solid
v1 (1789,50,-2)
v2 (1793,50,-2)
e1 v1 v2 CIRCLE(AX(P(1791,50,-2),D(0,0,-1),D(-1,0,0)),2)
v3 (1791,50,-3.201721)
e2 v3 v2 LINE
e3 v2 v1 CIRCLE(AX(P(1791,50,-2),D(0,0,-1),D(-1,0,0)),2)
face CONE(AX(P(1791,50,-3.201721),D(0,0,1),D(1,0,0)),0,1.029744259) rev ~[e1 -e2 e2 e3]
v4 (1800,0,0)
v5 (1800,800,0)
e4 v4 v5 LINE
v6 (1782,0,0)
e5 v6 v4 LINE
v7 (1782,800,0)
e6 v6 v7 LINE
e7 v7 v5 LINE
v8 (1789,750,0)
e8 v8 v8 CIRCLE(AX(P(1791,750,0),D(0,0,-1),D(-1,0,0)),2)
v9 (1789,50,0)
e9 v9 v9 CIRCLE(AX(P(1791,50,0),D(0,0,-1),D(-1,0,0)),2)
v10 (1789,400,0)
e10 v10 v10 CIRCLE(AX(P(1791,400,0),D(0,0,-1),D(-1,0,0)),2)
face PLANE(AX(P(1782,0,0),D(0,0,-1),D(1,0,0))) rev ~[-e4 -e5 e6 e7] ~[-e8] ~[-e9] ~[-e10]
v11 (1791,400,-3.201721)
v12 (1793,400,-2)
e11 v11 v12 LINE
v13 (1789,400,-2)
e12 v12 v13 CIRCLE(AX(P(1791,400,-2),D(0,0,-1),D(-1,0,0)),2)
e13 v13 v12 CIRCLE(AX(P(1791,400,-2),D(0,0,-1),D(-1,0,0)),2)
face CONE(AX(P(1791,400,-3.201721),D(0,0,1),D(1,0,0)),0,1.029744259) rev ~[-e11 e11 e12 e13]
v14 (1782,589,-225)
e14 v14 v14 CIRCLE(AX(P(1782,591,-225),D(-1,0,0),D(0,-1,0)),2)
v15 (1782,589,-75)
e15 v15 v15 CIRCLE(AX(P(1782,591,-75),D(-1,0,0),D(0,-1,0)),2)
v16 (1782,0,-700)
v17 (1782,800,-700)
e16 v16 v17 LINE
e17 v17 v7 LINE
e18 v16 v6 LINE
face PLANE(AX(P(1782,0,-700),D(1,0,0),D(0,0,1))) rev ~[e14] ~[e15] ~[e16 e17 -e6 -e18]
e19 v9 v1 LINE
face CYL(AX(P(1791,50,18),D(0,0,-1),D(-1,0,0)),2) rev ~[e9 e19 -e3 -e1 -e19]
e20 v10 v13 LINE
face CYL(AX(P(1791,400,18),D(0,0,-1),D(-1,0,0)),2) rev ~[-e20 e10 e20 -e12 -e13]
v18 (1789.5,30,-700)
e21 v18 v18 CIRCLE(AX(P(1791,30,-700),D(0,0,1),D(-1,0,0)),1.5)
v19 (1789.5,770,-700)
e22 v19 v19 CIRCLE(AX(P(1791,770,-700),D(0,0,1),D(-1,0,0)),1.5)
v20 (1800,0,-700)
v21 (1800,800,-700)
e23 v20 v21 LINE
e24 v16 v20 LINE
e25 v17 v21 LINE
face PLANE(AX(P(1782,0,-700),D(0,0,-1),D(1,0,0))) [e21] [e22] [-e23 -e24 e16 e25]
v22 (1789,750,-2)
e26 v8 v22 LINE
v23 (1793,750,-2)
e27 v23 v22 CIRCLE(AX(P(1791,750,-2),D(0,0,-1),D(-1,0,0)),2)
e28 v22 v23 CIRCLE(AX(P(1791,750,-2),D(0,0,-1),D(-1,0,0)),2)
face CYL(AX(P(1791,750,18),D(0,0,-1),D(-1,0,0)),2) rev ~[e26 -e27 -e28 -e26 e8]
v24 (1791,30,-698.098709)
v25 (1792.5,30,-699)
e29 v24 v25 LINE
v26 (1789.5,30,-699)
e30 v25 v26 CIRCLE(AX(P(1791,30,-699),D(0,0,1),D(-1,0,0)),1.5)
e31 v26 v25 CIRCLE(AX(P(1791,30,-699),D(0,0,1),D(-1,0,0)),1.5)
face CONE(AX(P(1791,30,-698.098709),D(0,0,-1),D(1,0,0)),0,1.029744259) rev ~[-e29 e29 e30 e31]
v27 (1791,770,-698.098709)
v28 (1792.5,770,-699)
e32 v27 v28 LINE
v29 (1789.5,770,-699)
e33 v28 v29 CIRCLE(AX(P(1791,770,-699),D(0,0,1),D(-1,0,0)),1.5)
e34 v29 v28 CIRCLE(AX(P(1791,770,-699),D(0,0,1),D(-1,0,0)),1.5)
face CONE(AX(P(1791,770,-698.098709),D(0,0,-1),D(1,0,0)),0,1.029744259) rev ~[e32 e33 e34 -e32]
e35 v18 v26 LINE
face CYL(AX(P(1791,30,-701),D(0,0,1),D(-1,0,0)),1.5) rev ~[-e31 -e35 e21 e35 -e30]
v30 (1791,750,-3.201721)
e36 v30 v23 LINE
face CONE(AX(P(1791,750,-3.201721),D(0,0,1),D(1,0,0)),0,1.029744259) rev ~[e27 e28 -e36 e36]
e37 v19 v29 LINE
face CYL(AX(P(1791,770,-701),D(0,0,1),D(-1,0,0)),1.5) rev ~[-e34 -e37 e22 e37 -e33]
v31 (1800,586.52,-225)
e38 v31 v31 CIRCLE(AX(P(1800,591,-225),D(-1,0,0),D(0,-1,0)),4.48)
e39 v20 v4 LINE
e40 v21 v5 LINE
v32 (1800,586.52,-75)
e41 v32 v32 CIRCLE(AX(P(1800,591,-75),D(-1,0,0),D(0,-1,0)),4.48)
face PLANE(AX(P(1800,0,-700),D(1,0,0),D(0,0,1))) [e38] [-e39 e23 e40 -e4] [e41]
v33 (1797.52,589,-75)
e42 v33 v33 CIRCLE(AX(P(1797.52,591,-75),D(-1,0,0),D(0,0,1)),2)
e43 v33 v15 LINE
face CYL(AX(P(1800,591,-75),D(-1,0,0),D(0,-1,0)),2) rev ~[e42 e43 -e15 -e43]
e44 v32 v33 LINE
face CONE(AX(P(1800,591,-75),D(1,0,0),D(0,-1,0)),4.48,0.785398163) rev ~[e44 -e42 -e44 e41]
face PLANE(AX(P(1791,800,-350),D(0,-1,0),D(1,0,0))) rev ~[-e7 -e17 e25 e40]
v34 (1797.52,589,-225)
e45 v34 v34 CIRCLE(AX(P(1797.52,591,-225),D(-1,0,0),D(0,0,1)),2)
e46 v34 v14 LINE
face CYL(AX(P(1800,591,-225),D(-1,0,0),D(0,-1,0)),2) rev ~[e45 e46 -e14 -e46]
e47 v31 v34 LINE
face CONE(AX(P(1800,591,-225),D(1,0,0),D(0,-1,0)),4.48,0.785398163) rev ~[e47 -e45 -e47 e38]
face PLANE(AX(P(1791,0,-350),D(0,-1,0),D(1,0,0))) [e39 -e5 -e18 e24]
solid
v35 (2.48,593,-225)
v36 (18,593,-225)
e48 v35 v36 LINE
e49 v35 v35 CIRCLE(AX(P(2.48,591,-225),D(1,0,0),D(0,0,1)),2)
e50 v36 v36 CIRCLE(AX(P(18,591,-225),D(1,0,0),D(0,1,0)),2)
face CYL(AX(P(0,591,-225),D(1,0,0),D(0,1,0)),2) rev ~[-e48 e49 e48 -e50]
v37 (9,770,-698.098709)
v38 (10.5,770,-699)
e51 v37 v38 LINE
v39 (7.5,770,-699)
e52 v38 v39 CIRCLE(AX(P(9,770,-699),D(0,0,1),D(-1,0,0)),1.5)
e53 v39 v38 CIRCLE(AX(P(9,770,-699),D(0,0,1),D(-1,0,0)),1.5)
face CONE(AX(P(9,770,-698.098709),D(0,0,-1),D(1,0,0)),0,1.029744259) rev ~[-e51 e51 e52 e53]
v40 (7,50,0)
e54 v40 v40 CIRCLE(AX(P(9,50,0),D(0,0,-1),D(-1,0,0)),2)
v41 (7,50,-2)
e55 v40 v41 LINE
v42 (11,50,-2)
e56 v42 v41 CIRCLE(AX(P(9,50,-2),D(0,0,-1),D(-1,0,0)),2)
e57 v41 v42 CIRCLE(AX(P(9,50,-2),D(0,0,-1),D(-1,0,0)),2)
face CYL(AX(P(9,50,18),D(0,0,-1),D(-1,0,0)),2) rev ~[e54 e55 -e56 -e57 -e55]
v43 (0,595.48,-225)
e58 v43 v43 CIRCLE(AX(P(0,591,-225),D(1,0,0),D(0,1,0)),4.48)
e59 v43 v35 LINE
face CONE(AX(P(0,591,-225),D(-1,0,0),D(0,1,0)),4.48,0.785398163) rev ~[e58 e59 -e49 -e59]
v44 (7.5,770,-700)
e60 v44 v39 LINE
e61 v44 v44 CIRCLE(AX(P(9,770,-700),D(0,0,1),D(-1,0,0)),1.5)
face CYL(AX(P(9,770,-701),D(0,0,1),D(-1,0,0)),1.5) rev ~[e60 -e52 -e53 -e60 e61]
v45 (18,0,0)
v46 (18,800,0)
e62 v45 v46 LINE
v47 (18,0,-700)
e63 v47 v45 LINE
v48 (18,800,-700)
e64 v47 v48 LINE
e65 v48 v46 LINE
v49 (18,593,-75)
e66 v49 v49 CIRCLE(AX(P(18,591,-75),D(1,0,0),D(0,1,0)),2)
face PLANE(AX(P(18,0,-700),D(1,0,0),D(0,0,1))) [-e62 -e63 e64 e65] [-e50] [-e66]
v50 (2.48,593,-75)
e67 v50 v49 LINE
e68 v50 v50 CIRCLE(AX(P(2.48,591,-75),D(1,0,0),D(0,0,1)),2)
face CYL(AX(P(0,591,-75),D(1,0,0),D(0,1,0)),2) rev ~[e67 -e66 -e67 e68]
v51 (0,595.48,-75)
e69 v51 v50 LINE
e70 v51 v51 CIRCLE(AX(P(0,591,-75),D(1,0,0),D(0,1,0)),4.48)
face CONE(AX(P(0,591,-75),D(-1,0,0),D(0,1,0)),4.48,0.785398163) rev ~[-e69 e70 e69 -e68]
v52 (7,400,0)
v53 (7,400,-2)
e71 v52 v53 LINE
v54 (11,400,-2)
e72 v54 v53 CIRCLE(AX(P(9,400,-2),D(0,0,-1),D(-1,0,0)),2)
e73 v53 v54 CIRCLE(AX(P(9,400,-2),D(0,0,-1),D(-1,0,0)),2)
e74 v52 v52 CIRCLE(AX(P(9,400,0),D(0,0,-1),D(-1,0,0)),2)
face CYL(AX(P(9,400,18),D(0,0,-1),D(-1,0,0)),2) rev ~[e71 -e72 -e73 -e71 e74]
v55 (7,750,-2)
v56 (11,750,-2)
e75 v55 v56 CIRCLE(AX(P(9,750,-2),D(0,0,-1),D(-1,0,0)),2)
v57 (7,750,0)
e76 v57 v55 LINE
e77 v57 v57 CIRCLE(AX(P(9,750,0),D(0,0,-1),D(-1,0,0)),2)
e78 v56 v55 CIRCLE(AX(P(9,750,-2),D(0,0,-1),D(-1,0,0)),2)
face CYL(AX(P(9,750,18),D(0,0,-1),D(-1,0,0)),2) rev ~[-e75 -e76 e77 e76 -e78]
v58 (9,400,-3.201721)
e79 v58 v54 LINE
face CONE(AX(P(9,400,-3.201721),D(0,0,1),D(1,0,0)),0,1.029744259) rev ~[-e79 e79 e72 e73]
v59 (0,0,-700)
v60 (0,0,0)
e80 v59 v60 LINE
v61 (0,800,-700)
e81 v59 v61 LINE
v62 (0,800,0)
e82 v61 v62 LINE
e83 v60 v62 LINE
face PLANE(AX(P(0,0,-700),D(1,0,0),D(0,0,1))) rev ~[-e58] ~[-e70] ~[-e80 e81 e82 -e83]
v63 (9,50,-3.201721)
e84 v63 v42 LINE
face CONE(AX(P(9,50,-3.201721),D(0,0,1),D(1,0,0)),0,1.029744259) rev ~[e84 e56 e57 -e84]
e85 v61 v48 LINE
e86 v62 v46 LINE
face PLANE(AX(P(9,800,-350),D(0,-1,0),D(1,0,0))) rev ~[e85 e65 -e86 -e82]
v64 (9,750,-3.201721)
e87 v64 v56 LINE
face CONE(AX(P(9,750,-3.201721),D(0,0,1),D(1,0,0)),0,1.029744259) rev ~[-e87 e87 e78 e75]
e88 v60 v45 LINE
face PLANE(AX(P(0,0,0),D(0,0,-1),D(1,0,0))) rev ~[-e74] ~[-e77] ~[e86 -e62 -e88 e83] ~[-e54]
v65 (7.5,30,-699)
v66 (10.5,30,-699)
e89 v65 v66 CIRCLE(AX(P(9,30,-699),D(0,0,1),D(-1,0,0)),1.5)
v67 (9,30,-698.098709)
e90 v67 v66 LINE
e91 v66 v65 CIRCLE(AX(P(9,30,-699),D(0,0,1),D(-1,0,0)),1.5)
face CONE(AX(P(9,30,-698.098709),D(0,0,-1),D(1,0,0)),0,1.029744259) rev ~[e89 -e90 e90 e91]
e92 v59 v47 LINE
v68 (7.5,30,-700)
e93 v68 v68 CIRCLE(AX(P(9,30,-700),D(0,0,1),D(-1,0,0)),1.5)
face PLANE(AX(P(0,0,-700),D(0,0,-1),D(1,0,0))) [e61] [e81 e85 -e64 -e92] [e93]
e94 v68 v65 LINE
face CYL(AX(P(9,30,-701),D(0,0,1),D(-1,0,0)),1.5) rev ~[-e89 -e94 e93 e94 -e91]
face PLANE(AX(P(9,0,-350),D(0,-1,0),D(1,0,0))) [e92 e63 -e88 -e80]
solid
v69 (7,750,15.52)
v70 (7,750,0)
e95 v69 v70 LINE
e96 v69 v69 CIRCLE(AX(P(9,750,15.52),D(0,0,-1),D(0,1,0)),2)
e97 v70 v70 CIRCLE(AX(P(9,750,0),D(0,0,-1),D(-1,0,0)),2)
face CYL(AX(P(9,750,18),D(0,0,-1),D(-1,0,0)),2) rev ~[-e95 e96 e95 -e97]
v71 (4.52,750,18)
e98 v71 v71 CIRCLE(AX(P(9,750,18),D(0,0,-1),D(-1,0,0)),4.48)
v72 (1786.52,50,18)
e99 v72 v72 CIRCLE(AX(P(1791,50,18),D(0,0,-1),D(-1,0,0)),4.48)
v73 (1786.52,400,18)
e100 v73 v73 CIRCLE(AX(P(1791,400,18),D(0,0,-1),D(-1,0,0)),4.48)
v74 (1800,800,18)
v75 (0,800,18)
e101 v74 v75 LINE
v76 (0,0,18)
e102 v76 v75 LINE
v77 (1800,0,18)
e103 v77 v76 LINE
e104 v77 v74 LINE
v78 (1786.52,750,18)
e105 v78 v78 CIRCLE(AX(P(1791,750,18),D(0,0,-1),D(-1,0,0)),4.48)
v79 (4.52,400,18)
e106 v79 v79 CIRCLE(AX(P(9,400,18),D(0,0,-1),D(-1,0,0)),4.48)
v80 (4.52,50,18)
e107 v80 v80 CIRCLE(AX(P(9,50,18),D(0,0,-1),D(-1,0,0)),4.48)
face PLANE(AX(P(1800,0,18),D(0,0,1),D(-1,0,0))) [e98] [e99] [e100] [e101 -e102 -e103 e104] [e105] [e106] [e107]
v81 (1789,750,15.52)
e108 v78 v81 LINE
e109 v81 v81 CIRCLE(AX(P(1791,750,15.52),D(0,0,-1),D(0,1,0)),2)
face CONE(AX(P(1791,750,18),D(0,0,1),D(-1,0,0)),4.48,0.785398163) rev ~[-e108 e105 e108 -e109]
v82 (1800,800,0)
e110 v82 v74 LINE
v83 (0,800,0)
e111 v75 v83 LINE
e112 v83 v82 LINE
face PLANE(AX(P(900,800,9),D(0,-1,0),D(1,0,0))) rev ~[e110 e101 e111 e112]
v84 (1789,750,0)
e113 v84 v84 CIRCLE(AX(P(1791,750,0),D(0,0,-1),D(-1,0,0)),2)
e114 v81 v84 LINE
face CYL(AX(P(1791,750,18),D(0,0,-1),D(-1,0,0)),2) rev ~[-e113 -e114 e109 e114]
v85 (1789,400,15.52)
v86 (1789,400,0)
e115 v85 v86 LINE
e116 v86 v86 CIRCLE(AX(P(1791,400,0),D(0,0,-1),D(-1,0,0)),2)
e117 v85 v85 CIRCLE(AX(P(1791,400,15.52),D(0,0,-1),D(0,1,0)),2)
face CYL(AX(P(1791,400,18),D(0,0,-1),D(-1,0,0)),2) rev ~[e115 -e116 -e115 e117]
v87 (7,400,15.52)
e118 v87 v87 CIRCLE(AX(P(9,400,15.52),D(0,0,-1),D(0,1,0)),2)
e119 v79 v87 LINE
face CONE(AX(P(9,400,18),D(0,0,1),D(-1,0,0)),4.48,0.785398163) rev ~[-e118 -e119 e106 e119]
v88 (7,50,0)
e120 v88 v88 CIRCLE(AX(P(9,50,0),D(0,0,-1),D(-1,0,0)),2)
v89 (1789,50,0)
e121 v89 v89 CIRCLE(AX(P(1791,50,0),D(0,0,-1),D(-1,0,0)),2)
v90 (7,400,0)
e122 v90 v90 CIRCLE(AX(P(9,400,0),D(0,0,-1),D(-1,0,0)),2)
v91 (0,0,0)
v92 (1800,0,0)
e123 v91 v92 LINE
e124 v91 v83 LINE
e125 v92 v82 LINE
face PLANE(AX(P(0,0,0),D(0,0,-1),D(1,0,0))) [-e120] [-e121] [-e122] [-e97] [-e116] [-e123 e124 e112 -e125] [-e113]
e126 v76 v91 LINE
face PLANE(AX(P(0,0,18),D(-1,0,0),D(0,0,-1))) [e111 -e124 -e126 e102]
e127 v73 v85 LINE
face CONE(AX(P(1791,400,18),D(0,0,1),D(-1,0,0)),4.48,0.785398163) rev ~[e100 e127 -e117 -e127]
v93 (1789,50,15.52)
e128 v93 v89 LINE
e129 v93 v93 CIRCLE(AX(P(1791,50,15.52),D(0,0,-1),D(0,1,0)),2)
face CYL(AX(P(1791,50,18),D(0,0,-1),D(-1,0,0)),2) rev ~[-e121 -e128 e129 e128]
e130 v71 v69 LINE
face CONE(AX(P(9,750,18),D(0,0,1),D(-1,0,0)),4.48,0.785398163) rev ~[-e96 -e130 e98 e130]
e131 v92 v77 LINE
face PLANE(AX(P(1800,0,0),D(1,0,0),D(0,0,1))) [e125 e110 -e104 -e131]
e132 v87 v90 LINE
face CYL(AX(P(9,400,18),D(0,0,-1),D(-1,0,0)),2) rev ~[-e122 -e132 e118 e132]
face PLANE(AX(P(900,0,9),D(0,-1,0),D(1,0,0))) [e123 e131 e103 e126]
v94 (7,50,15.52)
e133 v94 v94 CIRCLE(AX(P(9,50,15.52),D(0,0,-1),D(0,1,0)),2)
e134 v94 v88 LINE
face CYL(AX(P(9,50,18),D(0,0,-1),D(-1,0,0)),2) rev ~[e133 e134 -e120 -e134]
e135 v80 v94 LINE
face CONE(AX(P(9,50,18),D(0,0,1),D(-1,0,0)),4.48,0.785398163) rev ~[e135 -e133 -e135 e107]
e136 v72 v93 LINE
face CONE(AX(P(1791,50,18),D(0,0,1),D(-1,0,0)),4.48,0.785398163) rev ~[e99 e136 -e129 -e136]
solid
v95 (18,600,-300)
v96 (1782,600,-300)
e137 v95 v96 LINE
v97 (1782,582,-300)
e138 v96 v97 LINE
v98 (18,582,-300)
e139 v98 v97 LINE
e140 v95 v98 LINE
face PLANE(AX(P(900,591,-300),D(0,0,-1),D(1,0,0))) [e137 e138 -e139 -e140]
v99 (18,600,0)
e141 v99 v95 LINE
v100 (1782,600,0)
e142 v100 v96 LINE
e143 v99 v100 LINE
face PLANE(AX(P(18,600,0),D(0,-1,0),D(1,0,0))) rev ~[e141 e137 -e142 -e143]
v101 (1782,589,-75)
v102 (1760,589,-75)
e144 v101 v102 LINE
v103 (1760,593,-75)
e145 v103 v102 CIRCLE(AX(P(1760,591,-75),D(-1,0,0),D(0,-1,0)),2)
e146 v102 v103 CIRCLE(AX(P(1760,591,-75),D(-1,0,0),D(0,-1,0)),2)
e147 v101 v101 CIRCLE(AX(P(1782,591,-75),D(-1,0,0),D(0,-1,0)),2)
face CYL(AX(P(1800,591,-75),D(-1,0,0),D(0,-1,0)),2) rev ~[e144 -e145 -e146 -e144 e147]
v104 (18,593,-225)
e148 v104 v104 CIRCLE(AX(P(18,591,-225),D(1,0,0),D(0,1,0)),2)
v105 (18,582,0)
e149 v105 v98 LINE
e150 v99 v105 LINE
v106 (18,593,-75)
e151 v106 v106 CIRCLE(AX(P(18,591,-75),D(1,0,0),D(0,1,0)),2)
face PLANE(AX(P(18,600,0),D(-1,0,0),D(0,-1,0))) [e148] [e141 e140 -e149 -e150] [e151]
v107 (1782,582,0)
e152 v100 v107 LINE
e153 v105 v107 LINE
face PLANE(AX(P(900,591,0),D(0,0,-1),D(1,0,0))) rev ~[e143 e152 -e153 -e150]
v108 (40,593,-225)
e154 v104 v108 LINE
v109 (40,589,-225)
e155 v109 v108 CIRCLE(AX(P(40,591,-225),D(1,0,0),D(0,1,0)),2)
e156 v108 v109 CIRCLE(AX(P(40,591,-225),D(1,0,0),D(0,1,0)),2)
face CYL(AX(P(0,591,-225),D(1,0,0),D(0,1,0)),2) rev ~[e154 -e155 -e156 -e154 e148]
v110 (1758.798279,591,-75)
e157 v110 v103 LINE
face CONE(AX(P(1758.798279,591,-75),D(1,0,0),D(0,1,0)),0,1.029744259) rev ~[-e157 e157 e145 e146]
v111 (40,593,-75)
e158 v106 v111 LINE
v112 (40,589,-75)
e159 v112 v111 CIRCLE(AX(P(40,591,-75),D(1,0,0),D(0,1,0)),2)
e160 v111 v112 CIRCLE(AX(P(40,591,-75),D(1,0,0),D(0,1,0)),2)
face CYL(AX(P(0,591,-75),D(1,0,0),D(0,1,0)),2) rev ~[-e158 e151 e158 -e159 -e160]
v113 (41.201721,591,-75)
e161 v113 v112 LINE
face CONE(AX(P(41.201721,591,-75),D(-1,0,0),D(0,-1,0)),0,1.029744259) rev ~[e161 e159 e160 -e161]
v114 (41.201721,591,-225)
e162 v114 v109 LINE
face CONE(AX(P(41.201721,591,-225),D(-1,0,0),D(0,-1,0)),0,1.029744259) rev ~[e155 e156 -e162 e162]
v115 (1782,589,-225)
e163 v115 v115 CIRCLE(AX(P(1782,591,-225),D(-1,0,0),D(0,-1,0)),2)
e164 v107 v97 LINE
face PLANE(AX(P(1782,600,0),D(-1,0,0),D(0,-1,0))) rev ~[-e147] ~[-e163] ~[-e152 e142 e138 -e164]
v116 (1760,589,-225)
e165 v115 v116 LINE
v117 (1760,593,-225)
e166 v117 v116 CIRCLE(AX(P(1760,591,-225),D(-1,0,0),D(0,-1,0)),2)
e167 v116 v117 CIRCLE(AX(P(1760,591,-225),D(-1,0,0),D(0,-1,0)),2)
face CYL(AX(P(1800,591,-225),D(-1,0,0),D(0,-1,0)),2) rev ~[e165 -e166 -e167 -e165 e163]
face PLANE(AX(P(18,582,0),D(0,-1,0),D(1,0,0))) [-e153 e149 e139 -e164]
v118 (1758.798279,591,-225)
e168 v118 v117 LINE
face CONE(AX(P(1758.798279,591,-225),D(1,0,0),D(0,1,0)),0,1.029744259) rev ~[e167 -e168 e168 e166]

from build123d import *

# Parameters (mm, degrees)
F1_DEPTH          = 800
F0_W              = 18
F0_H              = 700
F2_DEPTH          = 800
F3_W              = 1764
F3_H              = 18
F4_DEPTH          = 300
F6_D              = 4
F6_DEPTH          = 20
F6_CSINK_D        = 8.96
F6_CSINK_ANGLE    = 90
F6_TIP            = 1.2017212381
F6_2_D            = 4
F6_2_DEPTH        = 20
F6_2_CSINK_D      = 8.96
F6_2_CSINK_ANGLE  = 90
F6_2_TIP          = 1.2017212381
F6_3_D            = 4
F6_3_DEPTH        = 20
F6_3_CSINK_D      = 8.96
F6_3_CSINK_ANGLE  = 90
F6_3_TIP          = 1.2017212381
F8_D              = 4
F8_DEPTH          = 40
F8_CSINK_D        = 8.96
F8_CSINK_ANGLE    = 90
F8_TIP            = 1.2017212381
F8_2_D            = 4
F8_2_DEPTH        = 40
F8_2_CSINK_D      = 8.96
F8_2_CSINK_ANGLE  = 90
F8_2_TIP          = 1.2017212381
F10_D             = 4
F10_DEPTH         = 40
F10_CSINK_D       = 8.96
F10_CSINK_ANGLE   = 90
F10_TIP           = 1.2017212381
F10_2_D           = 4
F10_2_DEPTH       = 40
F10_2_CSINK_D     = 8.96
F10_2_CSINK_ANGLE = 90
F10_2_TIP         = 1.2017212381
F12_D             = 3
F12_DEPTH         = 1
F12_TIP           = 0.9012909285
F12_2_D           = 3
F12_2_DEPTH       = 1
F12_2_TIP         = 0.9012909285


# Not quite as in the source:
# - a feature names something its author has since deleted; it is built from what else it names


with BuildPart() as f1:
    # F0 (on Front) → F1 (new body)
    with BuildSketch(Plane.XZ):
        Polygon((0, 18), (0, 0), (18, 0), (1782, 0), (1800, 0), (1800, 18), align=None)
    extrude(amount=-F1_DEPTH)

    # F6
    with Locations(Plane.XY.offset(18)):
        with Locations((9, 750), (9, 400), (9, 50), (1791, 750), (1791, 400), (1791, 50)):
            CounterSinkHole(F6_D / 2, F6_CSINK_D / 2, depth=F6_DEPTH, counter_sink_angle=F6_CSINK_ANGLE)
            with Locations((0, 0, -(F6_DEPTH + F6_TIP / 2))):  # 118° drill point
                Cone(0, F6_D / 2, F6_TIP, mode=Mode.SUBTRACT)


with BuildPart() as f2:
    # F0 (on Front) → F2 (new body)
    with BuildSketch(Plane.XZ):
        with Locations((9, -350)):
            Rectangle(F0_W, F0_H)
    extrude(amount=-F2_DEPTH)

    # F6#2
    with Locations(Plane.XY.offset(18)):
        with Locations((9, 750), (9, 400), (9, 50), (1791, 750), (1791, 400), (1791, 50)):
            CounterSinkHole(F6_2_D / 2, F6_2_CSINK_D / 2, depth=F6_2_DEPTH, counter_sink_angle=F6_2_CSINK_ANGLE)
            with Locations((0, 0, -(F6_2_DEPTH + F6_2_TIP / 2))):  # 118° drill point
                Cone(0, F6_2_D / 2, F6_2_TIP, mode=Mode.SUBTRACT)

    # F8
    with Locations(Plane(origin=(0, 0, 0), x_dir=(0, -1, 0), z_dir=(-1, 0, 0))):
        with Locations((-591, -75), (-591, -225)):
            CounterSinkHole(F8_D / 2, F8_CSINK_D / 2, depth=F8_DEPTH, counter_sink_angle=F8_CSINK_ANGLE)
            with Locations((0, 0, -(F8_DEPTH + F8_TIP / 2))):  # 118° drill point
                Cone(0, F8_D / 2, F8_TIP, mode=Mode.SUBTRACT)

    # F12
    with Locations(Plane(origin=(0, 0, -700), x_dir=(1, 0, 0), z_dir=(0, 0, -1))):
        with Locations((1791, -30), (1791, -770), (9, -30), (9, -770)):
            Hole(F12_D / 2, depth=F12_DEPTH)
            with Locations((0, 0, -(F12_DEPTH + F12_TIP / 2))):  # 118° drill point
                Cone(0, F12_D / 2, F12_TIP, mode=Mode.SUBTRACT)


with BuildPart() as f2b:
    # F0 (on Front) → F2, piece 2 (new body)
    with BuildSketch(Plane.XZ):
        with Locations((1791, -350)):
            Rectangle(F0_W, F0_H)
    extrude(amount=-F2_DEPTH)

    # F6#3
    with Locations(Plane.XY.offset(18)):
        with Locations((9, 750), (9, 400), (9, 50), (1791, 750), (1791, 400), (1791, 50)):
            CounterSinkHole(F6_3_D / 2, F6_3_CSINK_D / 2, depth=F6_3_DEPTH, counter_sink_angle=F6_3_CSINK_ANGLE)
            with Locations((0, 0, -(F6_3_DEPTH + F6_3_TIP / 2))):  # 118° drill point
                Cone(0, F6_3_D / 2, F6_3_TIP, mode=Mode.SUBTRACT)

    # F10
    with Locations(Plane.YZ.offset(1800)):
        with Locations((591, -75), (591, -225)):
            CounterSinkHole(F10_D / 2, F10_CSINK_D / 2, depth=F10_DEPTH, counter_sink_angle=F10_CSINK_ANGLE)
            with Locations((0, 0, -(F10_DEPTH + F10_TIP / 2))):  # 118° drill point
                Cone(0, F10_D / 2, F10_TIP, mode=Mode.SUBTRACT)

    # F12#2
    with Locations(Plane(origin=(0, 0, -700), x_dir=(1, 0, 0), z_dir=(0, 0, -1))):
        with Locations((1791, -30), (1791, -770), (9, -30), (9, -770)):
            Hole(F12_2_D / 2, depth=F12_2_DEPTH)
            with Locations((0, 0, -(F12_2_DEPTH + F12_2_TIP / 2))):  # 118° drill point
                Cone(0, F12_2_D / 2, F12_2_TIP, mode=Mode.SUBTRACT)


with BuildPart() as f4:
    # F3 (on face) → F4 (new body)
    with BuildSketch(Plane(origin=(0, 0, 0), x_dir=(1, 0, 0), z_dir=(0, 0, -1))):
        with Locations((900, -591)):
            Rectangle(F3_W, F3_H)
    extrude(amount=F4_DEPTH)

    # F8#2
    with Locations(Plane(origin=(0, 0, 0), x_dir=(0, -1, 0), z_dir=(-1, 0, 0))):
        with Locations((-591, -75), (-591, -225)):
            CounterSinkHole(F8_2_D / 2, F8_2_CSINK_D / 2, depth=F8_2_DEPTH, counter_sink_angle=F8_2_CSINK_ANGLE)
            with Locations((0, 0, -(F8_2_DEPTH + F8_2_TIP / 2))):  # 118° drill point
                Cone(0, F8_2_D / 2, F8_2_TIP, mode=Mode.SUBTRACT)

    # F10#2
    with Locations(Plane.YZ.offset(1800)):
        with Locations((591, -75), (591, -225)):
            CounterSinkHole(F10_2_D / 2, F10_2_CSINK_D / 2, depth=F10_2_DEPTH, counter_sink_angle=F10_2_CSINK_ANGLE)
            with Locations((0, 0, -(F10_2_DEPTH + F10_2_TIP / 2))):  # 118° drill point
                Cone(0, F10_2_D / 2, F10_2_TIP, mode=Mode.SUBTRACT)


solid = Compound([f1.part, f2.part, f2b.part, f4.part])
